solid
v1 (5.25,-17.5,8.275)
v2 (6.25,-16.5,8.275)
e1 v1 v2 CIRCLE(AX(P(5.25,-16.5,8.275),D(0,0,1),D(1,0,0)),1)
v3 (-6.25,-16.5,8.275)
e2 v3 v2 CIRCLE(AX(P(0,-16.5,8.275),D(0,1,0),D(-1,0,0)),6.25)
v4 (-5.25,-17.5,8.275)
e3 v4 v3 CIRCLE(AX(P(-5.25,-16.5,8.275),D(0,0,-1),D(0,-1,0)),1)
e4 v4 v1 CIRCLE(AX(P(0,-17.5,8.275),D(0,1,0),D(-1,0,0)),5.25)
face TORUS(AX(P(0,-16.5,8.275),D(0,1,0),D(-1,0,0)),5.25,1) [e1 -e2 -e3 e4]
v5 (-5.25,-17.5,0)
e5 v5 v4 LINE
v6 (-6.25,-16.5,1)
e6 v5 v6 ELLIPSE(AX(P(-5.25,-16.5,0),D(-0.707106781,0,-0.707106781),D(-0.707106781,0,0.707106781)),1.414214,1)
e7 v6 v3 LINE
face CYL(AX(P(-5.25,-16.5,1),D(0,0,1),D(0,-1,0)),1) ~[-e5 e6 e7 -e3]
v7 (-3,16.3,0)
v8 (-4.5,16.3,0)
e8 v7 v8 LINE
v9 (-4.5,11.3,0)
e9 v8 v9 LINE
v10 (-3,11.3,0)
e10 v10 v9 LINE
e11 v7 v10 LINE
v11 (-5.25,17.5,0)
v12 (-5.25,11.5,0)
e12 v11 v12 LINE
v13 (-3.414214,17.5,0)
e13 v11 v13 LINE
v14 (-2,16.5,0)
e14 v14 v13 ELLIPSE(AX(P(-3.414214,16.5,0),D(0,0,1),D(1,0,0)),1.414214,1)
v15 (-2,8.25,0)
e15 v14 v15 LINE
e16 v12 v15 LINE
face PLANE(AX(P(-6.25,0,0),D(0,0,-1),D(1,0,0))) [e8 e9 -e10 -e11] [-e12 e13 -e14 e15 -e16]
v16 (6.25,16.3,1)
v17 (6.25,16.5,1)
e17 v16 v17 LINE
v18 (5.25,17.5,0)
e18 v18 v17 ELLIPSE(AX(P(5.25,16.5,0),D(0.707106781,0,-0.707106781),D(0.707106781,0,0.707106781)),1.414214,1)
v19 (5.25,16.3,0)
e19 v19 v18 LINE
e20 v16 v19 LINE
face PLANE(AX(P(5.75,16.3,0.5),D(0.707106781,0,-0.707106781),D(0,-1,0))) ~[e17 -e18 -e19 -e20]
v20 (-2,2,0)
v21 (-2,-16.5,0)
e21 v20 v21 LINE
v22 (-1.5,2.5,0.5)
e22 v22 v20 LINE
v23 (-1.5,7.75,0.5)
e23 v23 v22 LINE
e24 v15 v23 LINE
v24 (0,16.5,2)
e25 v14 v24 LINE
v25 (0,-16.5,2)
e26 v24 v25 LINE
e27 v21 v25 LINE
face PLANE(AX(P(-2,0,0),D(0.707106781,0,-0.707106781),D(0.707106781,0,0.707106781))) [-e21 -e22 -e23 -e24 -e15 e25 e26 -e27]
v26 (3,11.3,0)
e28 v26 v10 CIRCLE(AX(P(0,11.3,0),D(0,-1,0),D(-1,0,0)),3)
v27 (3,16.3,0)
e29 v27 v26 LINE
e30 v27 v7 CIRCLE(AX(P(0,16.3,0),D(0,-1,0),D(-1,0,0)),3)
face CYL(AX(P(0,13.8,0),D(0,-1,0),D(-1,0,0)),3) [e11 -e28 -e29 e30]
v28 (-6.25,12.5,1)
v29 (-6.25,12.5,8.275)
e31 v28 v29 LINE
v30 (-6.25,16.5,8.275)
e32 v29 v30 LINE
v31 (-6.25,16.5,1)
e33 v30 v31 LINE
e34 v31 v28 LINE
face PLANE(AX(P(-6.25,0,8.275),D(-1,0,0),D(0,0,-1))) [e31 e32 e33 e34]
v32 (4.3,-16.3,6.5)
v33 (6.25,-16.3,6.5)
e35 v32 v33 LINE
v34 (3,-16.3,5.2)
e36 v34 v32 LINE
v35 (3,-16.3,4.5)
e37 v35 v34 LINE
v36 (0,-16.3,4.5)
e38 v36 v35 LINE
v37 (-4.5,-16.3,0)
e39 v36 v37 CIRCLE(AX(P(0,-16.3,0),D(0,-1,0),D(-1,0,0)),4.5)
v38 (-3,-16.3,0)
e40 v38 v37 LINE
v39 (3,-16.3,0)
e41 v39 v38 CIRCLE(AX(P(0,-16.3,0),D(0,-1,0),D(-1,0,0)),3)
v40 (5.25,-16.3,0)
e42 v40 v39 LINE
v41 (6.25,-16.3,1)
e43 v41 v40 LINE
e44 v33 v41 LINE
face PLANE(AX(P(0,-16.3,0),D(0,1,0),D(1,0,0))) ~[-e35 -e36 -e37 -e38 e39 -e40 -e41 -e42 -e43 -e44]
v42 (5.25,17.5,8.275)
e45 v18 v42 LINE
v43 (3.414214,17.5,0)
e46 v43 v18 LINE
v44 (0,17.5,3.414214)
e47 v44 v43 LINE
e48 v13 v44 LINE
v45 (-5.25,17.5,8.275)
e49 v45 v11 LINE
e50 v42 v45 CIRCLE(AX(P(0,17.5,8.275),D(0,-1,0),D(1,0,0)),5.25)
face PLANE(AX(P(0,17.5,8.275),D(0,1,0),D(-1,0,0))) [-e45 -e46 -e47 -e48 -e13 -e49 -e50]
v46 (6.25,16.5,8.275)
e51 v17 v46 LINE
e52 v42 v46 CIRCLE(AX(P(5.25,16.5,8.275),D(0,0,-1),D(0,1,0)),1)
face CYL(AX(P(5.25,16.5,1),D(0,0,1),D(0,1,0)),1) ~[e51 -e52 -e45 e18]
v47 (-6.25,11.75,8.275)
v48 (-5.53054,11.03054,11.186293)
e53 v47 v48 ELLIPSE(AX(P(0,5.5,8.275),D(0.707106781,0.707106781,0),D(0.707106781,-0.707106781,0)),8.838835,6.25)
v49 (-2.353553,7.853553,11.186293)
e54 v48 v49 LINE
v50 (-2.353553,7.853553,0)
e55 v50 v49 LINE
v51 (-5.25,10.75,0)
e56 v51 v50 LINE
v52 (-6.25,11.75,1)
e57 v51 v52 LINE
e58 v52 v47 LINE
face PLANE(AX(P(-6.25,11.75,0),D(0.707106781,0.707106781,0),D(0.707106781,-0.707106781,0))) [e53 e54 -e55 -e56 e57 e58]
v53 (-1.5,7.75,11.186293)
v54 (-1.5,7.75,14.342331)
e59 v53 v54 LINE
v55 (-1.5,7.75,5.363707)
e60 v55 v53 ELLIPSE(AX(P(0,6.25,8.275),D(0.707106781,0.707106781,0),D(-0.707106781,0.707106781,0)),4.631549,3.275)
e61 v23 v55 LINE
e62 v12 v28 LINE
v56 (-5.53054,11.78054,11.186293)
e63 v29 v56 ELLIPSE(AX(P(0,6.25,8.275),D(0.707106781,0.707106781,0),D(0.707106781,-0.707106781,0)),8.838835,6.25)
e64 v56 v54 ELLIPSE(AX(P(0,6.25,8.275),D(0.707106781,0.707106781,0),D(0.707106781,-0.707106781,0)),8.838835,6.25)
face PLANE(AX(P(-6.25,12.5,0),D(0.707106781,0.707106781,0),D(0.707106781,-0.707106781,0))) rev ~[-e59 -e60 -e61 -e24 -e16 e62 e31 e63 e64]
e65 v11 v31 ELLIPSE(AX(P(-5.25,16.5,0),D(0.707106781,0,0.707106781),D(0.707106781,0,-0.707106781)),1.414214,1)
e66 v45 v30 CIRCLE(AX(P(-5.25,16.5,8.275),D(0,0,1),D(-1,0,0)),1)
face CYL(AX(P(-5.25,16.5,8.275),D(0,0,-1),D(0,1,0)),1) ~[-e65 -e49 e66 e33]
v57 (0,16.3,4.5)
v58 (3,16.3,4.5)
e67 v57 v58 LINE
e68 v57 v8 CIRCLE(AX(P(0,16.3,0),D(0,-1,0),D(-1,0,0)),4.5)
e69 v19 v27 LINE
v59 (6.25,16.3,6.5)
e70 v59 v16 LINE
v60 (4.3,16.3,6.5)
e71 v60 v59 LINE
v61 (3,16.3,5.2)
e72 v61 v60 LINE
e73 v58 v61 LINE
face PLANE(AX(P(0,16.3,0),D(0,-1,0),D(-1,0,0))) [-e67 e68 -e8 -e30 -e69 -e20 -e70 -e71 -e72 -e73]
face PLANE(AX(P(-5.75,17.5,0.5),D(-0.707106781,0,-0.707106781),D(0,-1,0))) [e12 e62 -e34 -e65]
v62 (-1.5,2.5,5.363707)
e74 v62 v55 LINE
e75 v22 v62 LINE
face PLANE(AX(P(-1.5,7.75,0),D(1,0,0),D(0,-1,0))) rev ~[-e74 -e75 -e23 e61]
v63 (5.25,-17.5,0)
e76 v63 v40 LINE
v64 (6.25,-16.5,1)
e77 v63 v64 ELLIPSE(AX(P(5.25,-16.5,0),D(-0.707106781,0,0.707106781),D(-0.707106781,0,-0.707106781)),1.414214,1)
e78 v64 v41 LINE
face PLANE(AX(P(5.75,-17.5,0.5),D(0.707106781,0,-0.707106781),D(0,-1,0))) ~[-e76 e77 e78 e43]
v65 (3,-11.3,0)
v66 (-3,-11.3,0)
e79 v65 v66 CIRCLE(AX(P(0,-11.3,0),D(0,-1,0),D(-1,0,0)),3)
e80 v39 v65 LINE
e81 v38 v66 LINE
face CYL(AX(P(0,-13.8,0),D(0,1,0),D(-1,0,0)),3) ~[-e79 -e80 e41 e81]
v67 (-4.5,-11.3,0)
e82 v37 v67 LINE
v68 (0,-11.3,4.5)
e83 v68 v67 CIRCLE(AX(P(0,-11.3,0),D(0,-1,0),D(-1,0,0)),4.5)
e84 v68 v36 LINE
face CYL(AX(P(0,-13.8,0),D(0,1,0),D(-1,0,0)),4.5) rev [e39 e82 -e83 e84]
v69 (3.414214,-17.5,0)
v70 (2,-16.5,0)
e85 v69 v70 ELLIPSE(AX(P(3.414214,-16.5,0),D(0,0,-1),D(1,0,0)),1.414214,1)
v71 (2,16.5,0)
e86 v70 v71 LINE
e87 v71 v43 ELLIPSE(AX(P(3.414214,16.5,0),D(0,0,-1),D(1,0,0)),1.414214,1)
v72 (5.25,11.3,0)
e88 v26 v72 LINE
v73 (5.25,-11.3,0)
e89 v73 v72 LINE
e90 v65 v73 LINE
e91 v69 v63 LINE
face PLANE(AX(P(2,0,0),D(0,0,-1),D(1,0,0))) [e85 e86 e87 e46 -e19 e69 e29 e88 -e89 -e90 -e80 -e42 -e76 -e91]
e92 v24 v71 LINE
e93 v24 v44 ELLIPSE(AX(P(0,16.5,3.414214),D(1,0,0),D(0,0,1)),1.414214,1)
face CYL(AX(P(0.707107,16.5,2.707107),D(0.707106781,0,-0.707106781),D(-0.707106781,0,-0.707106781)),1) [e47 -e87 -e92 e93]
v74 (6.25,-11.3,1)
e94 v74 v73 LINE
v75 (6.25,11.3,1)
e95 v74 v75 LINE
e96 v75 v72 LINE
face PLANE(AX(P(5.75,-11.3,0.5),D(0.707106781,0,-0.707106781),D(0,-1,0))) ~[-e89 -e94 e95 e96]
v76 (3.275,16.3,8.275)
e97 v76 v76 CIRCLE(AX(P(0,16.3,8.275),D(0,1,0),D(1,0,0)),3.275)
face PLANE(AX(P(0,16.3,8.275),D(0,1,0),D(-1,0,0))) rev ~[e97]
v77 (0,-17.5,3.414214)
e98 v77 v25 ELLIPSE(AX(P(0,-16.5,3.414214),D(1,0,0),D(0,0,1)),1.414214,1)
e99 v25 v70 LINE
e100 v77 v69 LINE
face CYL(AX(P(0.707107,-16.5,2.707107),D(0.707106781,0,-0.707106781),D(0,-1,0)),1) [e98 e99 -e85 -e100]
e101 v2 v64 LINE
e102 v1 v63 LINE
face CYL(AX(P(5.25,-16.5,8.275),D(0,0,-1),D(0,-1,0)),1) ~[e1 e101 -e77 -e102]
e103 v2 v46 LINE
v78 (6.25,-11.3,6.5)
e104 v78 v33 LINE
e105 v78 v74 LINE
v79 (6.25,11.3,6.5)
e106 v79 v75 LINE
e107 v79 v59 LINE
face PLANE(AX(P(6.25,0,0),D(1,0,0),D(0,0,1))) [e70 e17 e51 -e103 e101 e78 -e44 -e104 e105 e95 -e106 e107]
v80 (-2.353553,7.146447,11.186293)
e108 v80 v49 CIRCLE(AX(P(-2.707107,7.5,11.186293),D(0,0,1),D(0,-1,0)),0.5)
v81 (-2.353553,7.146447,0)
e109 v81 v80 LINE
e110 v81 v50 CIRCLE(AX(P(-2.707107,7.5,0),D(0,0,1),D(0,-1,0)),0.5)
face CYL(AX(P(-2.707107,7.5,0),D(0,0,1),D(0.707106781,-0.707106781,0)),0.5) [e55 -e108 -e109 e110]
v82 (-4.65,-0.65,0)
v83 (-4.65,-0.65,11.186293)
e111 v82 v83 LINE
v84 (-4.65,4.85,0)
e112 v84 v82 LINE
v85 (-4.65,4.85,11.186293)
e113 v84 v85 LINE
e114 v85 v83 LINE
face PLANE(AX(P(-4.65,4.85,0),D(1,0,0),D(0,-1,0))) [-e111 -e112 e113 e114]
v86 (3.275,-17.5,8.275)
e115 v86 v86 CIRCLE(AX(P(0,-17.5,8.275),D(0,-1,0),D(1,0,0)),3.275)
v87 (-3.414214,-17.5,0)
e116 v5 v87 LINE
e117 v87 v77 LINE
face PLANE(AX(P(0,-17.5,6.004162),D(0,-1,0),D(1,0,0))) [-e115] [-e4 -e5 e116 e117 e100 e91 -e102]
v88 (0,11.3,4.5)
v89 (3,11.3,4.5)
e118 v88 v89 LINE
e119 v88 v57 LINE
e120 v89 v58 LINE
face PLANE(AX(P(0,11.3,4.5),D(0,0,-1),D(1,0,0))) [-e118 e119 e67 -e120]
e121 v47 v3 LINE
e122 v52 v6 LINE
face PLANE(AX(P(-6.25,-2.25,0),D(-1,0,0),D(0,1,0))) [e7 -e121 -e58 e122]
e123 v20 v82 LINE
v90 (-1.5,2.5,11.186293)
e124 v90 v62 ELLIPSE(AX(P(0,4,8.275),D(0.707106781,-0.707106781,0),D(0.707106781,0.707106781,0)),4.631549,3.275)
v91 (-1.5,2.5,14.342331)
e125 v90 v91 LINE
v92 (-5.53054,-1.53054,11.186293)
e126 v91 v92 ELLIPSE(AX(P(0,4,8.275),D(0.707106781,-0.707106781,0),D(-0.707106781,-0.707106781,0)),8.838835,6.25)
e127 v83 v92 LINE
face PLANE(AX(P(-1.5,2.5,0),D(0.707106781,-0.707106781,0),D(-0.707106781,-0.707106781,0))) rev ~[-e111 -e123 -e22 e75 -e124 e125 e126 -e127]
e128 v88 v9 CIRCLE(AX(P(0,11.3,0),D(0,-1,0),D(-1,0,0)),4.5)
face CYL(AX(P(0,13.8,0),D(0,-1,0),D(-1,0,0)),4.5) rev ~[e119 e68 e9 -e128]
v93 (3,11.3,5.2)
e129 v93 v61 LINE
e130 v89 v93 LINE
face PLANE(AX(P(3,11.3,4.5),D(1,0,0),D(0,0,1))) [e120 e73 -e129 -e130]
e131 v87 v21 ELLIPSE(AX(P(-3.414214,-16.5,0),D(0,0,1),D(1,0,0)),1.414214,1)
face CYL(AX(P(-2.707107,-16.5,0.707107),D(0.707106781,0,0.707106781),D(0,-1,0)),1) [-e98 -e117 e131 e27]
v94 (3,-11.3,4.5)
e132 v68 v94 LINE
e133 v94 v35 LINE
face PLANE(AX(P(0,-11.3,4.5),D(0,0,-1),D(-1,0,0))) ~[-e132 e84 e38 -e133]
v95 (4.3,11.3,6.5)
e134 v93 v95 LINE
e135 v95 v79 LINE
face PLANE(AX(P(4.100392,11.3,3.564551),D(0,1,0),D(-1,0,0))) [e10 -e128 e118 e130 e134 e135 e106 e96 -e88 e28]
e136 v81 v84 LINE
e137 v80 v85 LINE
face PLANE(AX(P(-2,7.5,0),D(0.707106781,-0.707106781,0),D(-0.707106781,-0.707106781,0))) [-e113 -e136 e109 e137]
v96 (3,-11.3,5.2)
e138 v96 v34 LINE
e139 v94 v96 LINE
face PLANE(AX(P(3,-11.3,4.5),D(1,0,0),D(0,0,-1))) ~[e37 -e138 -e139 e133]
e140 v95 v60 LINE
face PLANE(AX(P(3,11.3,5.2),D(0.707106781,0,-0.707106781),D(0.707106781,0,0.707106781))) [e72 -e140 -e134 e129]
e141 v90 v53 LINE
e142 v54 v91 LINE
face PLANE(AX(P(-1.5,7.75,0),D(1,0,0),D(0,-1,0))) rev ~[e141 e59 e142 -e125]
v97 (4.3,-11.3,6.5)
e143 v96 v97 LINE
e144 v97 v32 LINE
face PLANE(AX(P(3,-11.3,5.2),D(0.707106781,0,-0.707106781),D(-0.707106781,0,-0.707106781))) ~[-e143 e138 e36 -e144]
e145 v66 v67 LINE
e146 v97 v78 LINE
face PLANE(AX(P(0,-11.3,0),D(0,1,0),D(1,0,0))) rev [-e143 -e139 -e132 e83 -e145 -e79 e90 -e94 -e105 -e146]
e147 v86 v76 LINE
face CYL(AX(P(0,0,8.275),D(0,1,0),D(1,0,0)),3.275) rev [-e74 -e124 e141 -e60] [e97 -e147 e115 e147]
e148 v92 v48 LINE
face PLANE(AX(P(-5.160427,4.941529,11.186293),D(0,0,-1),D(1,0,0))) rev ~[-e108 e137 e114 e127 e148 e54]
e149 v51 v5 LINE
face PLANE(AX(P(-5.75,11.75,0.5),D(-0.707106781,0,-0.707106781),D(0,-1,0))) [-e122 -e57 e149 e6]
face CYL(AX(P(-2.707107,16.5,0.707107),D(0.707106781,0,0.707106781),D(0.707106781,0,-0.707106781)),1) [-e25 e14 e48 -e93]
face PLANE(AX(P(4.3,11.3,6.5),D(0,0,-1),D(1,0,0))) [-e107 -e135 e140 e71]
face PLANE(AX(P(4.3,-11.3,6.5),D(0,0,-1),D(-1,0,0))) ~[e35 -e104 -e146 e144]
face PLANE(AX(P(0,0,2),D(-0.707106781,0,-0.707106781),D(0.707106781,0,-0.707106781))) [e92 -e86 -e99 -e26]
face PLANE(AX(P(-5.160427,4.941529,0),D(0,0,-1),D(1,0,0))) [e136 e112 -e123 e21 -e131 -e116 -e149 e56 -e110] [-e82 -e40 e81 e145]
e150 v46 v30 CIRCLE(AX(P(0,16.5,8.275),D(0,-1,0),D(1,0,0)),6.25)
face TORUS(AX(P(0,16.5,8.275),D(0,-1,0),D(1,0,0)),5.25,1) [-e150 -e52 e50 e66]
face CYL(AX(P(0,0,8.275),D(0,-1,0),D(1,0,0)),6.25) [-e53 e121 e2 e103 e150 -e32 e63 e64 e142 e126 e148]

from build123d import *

# Parameters (mm, degrees)
F0_R      = 3.275
F1_DEPTH  = 17.5
F3_DEPTH  = 14.526
F5_DEPTH  = 11.1862926682
F7_DEPTH  = 35.001
F8_R      = 0.5
F9_W      = 1.5
F9_H      = 5
F12_DEPTH = 5
F13_SIZE  = 1
F14_R     = 1
F15_R     = 3.275
F16_DEPTH = 1.2


# Not quite as in the source:
# - a pattern or mirror of a feature is missing from the dataset's text; its kind, count and spacing are read off the source's solid
# - a feature names something its author has since deleted; it is built from what else it names


with BuildPart() as f1:
    # F0 (on Front) → F1 (new body, symmetric)
    with BuildSketch(Plane.XZ):
        with BuildLine():
            Line((-6.25, 8.275), (-6.25, 0))
            Line((-6.25, 0), (-2, 0))
            Line((-2, 0), (0, 2))
            Line((0, 2), (2, 0))
            Line((2, 0), (6.25, 0))
            Line((6.25, 0), (6.25, 8.275))
            ThreePointArc((6.25, 8.275), (0, 14.525), (-6.25, 8.275))
        make_face()
        with Locations((0, 8.275)):
            Circle(F0_R, mode=Mode.SUBTRACT)
    extrude(amount=F1_DEPTH, both=True)

    # F2 (on face) → F3 (cut, through all)
    with BuildSketch(Plane(origin=(0, 0, 0), x_dir=(1, 0, 0), z_dir=(0, 0, -1))):
        Polygon((-1.5, -2.5), (-6.25, 2.25), (-6.25, -12.5), (-1.5, -7.75), align=None)
    extrude(amount=-F3_DEPTH, mode=Mode.SUBTRACT)

    # F4 (on face) → F5 (join, through all)
    with BuildSketch(Plane(origin=(0, 0, 0), x_dir=(1, 0, 0), z_dir=(0, 0, -1))):
        Polygon((-4.65, 0.65), (-6.25, 2.25), (-6.25, -11.75), (-2, -7.5), (-4.65, -4.85), align=None)
    extrude(amount=-F5_DEPTH)

    # F6 (on face) → F7 (cut, through all)
    with BuildSketch(Plane.XZ.offset(17.5)):
        with BuildLine():
            Line((-6.25, 11.1862926682), (-6.25, 8.275))
            ThreePointArc((-6.25, 8.275), (-6.0674696664, 9.774437177), (-5.5305402087, 11.1862926682))
            Line((-5.5305402087, 11.1862926682), (-6.25, 11.1862926682))
        make_face()
    extrude(amount=-F7_DEPTH, mode=Mode.SUBTRACT)

    # F8
    f8_edges = [f1.edges().sort_by_distance(p)[0] for p in [
        (-2, 7.5, 5.593146),
    ]]
    fillet(f8_edges, radius=F8_R)

    # F9 (on face) → F10 (revolve, cut)
    with BuildSketch(Plane(origin=(0, 0, 0), x_dir=(1, 0, 0), z_dir=(0, 0, -1))):
        with Locations((-3.75, -13.8)):
            Rectangle(F9_W, F9_H)
    f10 = revolve(axis=Axis((0, 0.2600380681, 0), (0, -1, 0)), mode=Mode.SUBTRACT)

    # F10_copies: F10 across plane
    add(f10.mirror(Plane(origin=(0, 0, 0), x_dir=(0, 0, -1), z_dir=(0, -1, 0))), mode=Mode.SUBTRACT)

    # F11 (on face) → F12 (cut, through all)
    with BuildSketch(Plane(origin=(0, 11.3, 0), x_dir=(-1, 0, 0), z_dir=(0, 1, 0))):
        with BuildLine():
            ThreePointArc((-4.5, 0), (-3.1819805153, 3.1819805153), (0, 4.5))
            Line((0, 4.5), (-3, 4.5))
            Line((-3, 4.5), (-3, 5.2))
            Line((-3, 5.2), (-4.3, 6.5))
            Line((-4.3, 6.5), (-6.25, 6.5))
            Line((-6.25, 6.5), (-6.25, 4.5))
            Line((-6.25, 4.5), (-6.25, 0))
            Line((-6.25, 0), (-4.5, 0))
        make_face()
    f12 = extrude(amount=F12_DEPTH, mode=Mode.SUBTRACT)

    # F12_copies: F12 across plane
    add(f12.mirror(Plane(origin=(0, 0, 0), x_dir=(0, 0, -1), z_dir=(0, -1, 0))), mode=Mode.SUBTRACT)

    # F13
    f13_edges = [f1.edges().sort_by_distance(p)[0] for p in [
        (-6.25, 15, 0),
        (-6.25, -2.875, 0),
        (6.25, 0, 0),
        (6.25, -16.9, 0),
        (6.25, 16.9, 0),
    ]]
    chamfer(f13_edges, length=F13_SIZE)

    # F14
    f14_edges = [f1.edges().sort_by_distance(p)[0] for p in [
        (-1, 17.5, 1),
        (1, 17.5, 1),
        (-1, -17.5, 1),
        (1, -17.5, 1),
        (-6.25, 17.5, 4.6375),
        (0, -17.5, 14.525),
        (0, 17.5, 14.525),
        (6.25, 17.5, 4.6375),
        (-6.25, -17.5, 4.6375),
        (6.25, -17.5, 4.6375),
    ]]
    fillet(f14_edges, radius=F14_R)

    # F15 (on face) → F16 (join)
    with BuildSketch(Plane(origin=(0, 17.5, 0), x_dir=(-1, 0, 0), z_dir=(0, 1, 0))):
        with Locations((0, 8.275)):
            Circle(F15_R)
    extrude(amount=-F16_DEPTH)


solid = f1.part
